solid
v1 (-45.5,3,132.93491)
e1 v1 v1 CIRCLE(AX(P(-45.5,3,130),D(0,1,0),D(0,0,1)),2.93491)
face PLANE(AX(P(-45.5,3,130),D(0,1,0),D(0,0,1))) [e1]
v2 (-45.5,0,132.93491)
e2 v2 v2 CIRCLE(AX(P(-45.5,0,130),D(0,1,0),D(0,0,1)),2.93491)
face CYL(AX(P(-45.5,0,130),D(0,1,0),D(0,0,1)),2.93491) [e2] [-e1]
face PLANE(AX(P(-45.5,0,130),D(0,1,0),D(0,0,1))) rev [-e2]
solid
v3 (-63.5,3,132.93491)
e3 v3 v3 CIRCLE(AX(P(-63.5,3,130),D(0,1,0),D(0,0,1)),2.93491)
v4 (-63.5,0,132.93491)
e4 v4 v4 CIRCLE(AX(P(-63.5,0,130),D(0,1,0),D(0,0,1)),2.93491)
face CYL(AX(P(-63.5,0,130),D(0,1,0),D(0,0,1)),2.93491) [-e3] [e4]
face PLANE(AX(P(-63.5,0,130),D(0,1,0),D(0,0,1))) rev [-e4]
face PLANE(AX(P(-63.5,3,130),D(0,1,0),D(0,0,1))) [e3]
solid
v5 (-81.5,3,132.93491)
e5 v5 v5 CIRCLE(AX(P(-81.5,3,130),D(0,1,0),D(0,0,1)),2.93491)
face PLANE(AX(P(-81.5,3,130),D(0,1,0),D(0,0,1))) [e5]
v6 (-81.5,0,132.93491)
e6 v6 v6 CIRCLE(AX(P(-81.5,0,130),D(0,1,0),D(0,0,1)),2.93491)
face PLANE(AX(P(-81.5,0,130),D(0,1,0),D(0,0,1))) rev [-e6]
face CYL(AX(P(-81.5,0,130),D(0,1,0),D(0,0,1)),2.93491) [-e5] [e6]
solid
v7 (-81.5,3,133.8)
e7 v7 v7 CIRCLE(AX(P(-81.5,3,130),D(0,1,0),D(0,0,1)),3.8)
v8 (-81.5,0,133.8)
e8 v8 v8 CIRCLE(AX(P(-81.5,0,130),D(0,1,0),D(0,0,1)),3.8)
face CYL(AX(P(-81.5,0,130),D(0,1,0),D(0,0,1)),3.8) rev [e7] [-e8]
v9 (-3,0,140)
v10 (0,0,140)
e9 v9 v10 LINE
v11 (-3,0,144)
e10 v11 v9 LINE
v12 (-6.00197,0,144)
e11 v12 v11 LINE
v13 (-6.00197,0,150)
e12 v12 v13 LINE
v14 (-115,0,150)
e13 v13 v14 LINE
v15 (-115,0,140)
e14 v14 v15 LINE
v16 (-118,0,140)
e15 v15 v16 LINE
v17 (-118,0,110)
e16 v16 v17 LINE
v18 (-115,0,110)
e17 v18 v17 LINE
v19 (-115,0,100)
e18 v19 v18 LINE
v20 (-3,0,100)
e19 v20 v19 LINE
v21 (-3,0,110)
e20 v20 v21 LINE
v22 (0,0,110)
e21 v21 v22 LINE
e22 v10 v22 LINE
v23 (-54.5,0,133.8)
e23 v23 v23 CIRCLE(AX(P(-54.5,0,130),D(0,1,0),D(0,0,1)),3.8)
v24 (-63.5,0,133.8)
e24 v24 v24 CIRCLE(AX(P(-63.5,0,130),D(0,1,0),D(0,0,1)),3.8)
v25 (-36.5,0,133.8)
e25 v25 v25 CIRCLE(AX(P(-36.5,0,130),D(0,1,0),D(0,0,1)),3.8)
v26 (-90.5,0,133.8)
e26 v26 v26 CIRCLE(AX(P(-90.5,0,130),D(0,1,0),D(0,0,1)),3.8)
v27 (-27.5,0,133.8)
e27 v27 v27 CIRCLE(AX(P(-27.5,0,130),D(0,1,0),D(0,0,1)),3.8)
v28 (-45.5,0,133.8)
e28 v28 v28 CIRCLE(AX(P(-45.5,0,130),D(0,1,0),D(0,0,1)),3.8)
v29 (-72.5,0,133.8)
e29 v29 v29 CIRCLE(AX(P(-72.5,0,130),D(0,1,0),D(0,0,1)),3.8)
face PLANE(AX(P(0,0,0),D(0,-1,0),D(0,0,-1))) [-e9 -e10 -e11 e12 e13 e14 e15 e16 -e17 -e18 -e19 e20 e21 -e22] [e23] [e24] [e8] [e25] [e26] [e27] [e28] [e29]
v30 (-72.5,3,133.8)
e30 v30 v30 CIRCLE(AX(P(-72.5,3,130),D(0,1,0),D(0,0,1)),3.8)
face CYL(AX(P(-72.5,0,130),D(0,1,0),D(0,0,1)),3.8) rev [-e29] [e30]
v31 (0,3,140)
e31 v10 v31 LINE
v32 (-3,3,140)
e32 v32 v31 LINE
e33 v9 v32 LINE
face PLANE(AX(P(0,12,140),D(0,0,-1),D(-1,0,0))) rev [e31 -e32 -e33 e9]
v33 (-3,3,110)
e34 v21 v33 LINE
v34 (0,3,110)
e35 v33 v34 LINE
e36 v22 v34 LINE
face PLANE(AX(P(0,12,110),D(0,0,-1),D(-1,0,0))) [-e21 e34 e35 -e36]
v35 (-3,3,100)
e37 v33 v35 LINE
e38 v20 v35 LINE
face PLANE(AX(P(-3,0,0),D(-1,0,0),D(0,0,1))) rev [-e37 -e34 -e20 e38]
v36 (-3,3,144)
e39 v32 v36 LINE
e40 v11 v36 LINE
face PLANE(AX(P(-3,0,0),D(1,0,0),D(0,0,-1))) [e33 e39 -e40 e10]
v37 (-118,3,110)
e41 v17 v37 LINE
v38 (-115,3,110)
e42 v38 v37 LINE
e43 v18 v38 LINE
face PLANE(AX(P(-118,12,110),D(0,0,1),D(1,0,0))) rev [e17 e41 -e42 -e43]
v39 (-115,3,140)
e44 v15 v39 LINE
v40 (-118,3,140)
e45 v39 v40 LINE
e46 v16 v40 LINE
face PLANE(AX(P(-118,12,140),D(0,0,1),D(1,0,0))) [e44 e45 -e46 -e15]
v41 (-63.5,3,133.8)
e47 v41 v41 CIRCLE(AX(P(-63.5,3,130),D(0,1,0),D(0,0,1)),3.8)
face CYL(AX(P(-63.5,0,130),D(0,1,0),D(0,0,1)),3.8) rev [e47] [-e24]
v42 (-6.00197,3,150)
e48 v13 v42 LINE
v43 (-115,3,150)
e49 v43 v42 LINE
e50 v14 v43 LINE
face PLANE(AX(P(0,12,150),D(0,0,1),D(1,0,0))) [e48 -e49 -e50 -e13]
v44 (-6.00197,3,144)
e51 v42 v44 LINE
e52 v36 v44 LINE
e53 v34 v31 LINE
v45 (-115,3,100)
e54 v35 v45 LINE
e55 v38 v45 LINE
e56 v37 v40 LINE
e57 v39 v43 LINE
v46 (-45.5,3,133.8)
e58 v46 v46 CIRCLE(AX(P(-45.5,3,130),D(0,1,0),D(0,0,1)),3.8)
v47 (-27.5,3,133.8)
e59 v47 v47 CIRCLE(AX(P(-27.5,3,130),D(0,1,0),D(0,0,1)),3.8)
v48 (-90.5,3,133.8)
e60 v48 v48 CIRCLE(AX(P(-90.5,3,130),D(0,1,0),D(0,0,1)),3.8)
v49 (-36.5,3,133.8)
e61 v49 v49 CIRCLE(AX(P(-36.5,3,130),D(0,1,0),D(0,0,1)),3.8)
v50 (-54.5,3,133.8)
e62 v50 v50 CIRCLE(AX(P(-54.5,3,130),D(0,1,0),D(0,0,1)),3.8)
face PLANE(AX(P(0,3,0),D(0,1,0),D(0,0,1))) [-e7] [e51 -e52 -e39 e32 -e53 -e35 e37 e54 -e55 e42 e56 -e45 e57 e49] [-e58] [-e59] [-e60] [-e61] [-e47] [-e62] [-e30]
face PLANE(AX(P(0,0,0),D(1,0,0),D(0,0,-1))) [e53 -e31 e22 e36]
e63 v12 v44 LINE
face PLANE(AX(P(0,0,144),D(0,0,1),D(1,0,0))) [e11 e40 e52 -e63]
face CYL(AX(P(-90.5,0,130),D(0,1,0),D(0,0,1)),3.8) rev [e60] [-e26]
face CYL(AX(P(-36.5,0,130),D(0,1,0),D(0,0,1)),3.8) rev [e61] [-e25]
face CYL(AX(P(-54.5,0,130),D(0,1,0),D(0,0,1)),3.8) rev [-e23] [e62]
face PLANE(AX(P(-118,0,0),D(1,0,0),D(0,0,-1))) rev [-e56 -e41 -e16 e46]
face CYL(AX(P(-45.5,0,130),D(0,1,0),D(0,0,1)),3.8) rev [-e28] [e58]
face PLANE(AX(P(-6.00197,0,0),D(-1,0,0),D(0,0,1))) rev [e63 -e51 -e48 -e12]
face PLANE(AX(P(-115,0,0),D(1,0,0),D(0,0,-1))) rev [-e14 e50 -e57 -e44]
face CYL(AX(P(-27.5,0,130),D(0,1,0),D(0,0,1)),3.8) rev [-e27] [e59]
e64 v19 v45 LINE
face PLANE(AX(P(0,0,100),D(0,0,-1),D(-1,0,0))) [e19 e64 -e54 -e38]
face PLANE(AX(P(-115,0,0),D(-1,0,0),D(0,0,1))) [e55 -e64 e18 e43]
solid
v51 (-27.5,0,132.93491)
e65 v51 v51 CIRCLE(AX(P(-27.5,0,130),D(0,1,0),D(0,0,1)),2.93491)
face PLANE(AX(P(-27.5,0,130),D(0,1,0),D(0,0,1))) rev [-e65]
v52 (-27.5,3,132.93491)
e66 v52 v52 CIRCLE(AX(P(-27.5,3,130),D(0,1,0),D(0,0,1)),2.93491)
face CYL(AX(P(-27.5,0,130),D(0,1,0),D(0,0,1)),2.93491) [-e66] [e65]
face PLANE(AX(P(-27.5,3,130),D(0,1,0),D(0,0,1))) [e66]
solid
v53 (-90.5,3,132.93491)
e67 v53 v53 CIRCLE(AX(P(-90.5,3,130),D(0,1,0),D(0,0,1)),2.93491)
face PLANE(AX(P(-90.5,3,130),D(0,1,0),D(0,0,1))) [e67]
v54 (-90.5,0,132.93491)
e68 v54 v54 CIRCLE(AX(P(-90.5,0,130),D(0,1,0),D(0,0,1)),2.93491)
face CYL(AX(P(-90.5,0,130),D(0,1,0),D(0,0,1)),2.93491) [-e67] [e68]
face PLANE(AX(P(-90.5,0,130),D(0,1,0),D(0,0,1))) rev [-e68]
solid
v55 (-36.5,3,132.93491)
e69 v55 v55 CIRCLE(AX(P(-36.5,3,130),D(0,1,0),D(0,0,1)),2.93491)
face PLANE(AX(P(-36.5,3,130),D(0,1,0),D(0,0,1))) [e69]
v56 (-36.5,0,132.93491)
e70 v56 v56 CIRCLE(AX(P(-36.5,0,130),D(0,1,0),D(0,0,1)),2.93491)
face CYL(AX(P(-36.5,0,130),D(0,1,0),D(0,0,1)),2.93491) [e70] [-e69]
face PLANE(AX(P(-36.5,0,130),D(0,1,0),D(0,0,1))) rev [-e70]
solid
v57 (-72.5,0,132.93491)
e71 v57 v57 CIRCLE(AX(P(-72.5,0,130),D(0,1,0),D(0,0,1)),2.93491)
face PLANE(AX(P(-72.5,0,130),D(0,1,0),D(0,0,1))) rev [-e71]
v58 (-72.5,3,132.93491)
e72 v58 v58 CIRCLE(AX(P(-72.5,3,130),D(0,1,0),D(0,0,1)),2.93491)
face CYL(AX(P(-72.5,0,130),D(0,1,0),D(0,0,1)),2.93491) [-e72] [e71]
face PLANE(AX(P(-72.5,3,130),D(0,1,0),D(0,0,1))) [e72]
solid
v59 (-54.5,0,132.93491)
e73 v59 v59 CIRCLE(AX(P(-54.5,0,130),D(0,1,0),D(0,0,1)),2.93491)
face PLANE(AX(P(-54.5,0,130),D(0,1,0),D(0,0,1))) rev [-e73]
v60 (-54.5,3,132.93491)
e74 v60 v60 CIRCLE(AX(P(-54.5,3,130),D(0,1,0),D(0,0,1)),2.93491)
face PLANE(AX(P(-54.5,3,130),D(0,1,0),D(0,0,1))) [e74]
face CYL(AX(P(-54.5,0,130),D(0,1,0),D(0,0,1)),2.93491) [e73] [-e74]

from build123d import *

# Parameters (mm, degrees)
LED_1_OUTLINE_R     = 2.25
LED_1_DEPTH         = 3
SKETCH_1_R          = 3.8
CUT_EXTRUDE_1_DEPTH = 3
SKETCH_3_R          = 2.934909796
EXTRUDE_1_DEPTH     = 3
EXTRUDE_1_2_DEPTH   = 3
EXTRUDE_1_3_DEPTH   = 3
EXTRUDE_1_4_DEPTH   = 3
EXTRUDE_1_5_DEPTH   = 3
EXTRUDE_1_6_DEPTH   = 3
EXTRUDE_1_7_DEPTH   = 3
EXTRUDE_1_8_DEPTH   = 3


# Read off the part's stored shape, not the designer's step: 基体零件-LED板-1
with BuildPart() as part:
    # 基体零件-LED板-1 outline → 基体零件-LED板-1 (new body)
    with BuildSketch(Plane(origin=(0, 0, 0), x_dir=(1, 0, 0), z_dir=(0, 1, 0))):
        Polygon((-3, -140), (0, -140), (0, -110), (-3, -110), (-3, -100), (-115, -100), (-115, -110), (-118, -110), (-118, -140), (-115, -140), (-115, -150), (-6.001970153, -150), (-6.001970153, -144), (-3, -144), align=None)
        with Locations((-90.5, -130)):
            Circle(LED_1_OUTLINE_R, mode=Mode.SUBTRACT)
        with Locations((-81.5, -130)):
            Circle(LED_1_OUTLINE_R, mode=Mode.SUBTRACT)
        with Locations((-72.5, -130)):
            Circle(LED_1_OUTLINE_R, mode=Mode.SUBTRACT)
        with Locations((-63.5, -130)):
            Circle(LED_1_OUTLINE_R, mode=Mode.SUBTRACT)
        with Locations((-54.5, -130)):
            Circle(LED_1_OUTLINE_R, mode=Mode.SUBTRACT)
        with Locations((-45.5, -130)):
            Circle(LED_1_OUTLINE_R, mode=Mode.SUBTRACT)
        with Locations((-36.5, -130)):
            Circle(LED_1_OUTLINE_R, mode=Mode.SUBTRACT)
        with Locations((-27.5, -130)):
            Circle(LED_1_OUTLINE_R, mode=Mode.SUBTRACT)
    extrude(amount=LED_1_DEPTH)

    # 草图1 → 切除-拉伸1 (cut)
    with BuildSketch(Plane(origin=(0, 3, 0), x_dir=(1, 0, 0), z_dir=(0, 1, 0))):
        with Locations(Location((-90.5, -130, 0), (0, 0, 270))):
            Circle(SKETCH_1_R)
        with Locations(Location((-81.5, -130, 0), (0, 0, 270))):
            Circle(SKETCH_1_R)
        with Locations(Location((-72.5, -130, 0), (0, 0, 270))):
            Circle(SKETCH_1_R)
        with Locations(Location((-63.5, -130, 0), (0, 0, 270))):
            Circle(SKETCH_1_R)
        with Locations(Location((-54.5, -130, 0), (0, 0, 270))):
            Circle(SKETCH_1_R)
        with Locations(Location((-45.5, -130, 0), (0, 0, 270))):
            Circle(SKETCH_1_R)
        with Locations(Location((-36.5, -130, 0), (0, 0, 270))):
            Circle(SKETCH_1_R)
        with Locations(Location((-27.5, -130, 0), (0, 0, 270))):
            Circle(SKETCH_1_R)
    extrude(amount=-CUT_EXTRUDE_1_DEPTH, mode=Mode.SUBTRACT)


with BuildPart() as body_2:
    # 草图3 → 凸台-拉伸1 (new body)
    with BuildSketch(Plane(origin=(0, 3, 0), x_dir=(1, 0, 0), z_dir=(0, 1, 0))):
        with Locations(Location((-27.5, -130, 0), (0, 0, 270))):
            Circle(SKETCH_3_R)
    extrude(amount=-EXTRUDE_1_DEPTH)


with BuildPart() as body_3:
    # 草图3 → Extrude 1 2 (new body)
    with BuildSketch(Plane(origin=(0, 3, 0), x_dir=(1, 0, 0), z_dir=(0, 1, 0))):
        with Locations(Location((-36.5, -130, 0), (0, 0, 270))):
            Circle(SKETCH_3_R)
    extrude(amount=-EXTRUDE_1_2_DEPTH)


with BuildPart() as body_4:
    # 草图3 → Extrude 1 3 (new body)
    with BuildSketch(Plane(origin=(0, 3, 0), x_dir=(1, 0, 0), z_dir=(0, 1, 0))):
        with Locations(Location((-45.5, -130, 0), (0, 0, 270))):
            Circle(SKETCH_3_R)
    extrude(amount=-EXTRUDE_1_3_DEPTH)


with BuildPart() as body_5:
    # 草图3 → Extrude 1 4 (new body)
    with BuildSketch(Plane(origin=(0, 3, 0), x_dir=(1, 0, 0), z_dir=(0, 1, 0))):
        with Locations(Location((-54.5, -130, 0), (0, 0, 270))):
            Circle(SKETCH_3_R)
    extrude(amount=-EXTRUDE_1_4_DEPTH)


with BuildPart() as body_6:
    # 草图3 → Extrude 1 5 (new body)
    with BuildSketch(Plane(origin=(0, 3, 0), x_dir=(1, 0, 0), z_dir=(0, 1, 0))):
        with Locations(Location((-63.5, -130, 0), (0, 0, 270))):
            Circle(SKETCH_3_R)
    extrude(amount=-EXTRUDE_1_5_DEPTH)


with BuildPart() as body_7:
    # 草图3 → Extrude 1 6 (new body)
    with BuildSketch(Plane(origin=(0, 3, 0), x_dir=(1, 0, 0), z_dir=(0, 1, 0))):
        with Locations(Location((-72.5, -130, 0), (0, 0, 270))):
            Circle(SKETCH_3_R)
    extrude(amount=-EXTRUDE_1_6_DEPTH)


with BuildPart() as body_8:
    # 草图3 → Extrude 1 7 (new body)
    with BuildSketch(Plane(origin=(0, 3, 0), x_dir=(1, 0, 0), z_dir=(0, 1, 0))):
        with Locations(Location((-81.5, -130, 0), (0, 0, 270))):
            Circle(SKETCH_3_R)
    extrude(amount=-EXTRUDE_1_7_DEPTH)


with BuildPart() as body_9:
    # 草图3 → Extrude 1 8 (new body)
    with BuildSketch(Plane(origin=(0, 3, 0), x_dir=(1, 0, 0), z_dir=(0, 1, 0))):
        with Locations(Location((-90.5, -130, 0), (0, 0, 270))):
            Circle(SKETCH_3_R)
    extrude(amount=-EXTRUDE_1_8_DEPTH)


solid = Compound([part.part, body_2.part, body_3.part, body_4.part, body_5.part, body_6.part, body_7.part, body_8.part, body_9.part])
